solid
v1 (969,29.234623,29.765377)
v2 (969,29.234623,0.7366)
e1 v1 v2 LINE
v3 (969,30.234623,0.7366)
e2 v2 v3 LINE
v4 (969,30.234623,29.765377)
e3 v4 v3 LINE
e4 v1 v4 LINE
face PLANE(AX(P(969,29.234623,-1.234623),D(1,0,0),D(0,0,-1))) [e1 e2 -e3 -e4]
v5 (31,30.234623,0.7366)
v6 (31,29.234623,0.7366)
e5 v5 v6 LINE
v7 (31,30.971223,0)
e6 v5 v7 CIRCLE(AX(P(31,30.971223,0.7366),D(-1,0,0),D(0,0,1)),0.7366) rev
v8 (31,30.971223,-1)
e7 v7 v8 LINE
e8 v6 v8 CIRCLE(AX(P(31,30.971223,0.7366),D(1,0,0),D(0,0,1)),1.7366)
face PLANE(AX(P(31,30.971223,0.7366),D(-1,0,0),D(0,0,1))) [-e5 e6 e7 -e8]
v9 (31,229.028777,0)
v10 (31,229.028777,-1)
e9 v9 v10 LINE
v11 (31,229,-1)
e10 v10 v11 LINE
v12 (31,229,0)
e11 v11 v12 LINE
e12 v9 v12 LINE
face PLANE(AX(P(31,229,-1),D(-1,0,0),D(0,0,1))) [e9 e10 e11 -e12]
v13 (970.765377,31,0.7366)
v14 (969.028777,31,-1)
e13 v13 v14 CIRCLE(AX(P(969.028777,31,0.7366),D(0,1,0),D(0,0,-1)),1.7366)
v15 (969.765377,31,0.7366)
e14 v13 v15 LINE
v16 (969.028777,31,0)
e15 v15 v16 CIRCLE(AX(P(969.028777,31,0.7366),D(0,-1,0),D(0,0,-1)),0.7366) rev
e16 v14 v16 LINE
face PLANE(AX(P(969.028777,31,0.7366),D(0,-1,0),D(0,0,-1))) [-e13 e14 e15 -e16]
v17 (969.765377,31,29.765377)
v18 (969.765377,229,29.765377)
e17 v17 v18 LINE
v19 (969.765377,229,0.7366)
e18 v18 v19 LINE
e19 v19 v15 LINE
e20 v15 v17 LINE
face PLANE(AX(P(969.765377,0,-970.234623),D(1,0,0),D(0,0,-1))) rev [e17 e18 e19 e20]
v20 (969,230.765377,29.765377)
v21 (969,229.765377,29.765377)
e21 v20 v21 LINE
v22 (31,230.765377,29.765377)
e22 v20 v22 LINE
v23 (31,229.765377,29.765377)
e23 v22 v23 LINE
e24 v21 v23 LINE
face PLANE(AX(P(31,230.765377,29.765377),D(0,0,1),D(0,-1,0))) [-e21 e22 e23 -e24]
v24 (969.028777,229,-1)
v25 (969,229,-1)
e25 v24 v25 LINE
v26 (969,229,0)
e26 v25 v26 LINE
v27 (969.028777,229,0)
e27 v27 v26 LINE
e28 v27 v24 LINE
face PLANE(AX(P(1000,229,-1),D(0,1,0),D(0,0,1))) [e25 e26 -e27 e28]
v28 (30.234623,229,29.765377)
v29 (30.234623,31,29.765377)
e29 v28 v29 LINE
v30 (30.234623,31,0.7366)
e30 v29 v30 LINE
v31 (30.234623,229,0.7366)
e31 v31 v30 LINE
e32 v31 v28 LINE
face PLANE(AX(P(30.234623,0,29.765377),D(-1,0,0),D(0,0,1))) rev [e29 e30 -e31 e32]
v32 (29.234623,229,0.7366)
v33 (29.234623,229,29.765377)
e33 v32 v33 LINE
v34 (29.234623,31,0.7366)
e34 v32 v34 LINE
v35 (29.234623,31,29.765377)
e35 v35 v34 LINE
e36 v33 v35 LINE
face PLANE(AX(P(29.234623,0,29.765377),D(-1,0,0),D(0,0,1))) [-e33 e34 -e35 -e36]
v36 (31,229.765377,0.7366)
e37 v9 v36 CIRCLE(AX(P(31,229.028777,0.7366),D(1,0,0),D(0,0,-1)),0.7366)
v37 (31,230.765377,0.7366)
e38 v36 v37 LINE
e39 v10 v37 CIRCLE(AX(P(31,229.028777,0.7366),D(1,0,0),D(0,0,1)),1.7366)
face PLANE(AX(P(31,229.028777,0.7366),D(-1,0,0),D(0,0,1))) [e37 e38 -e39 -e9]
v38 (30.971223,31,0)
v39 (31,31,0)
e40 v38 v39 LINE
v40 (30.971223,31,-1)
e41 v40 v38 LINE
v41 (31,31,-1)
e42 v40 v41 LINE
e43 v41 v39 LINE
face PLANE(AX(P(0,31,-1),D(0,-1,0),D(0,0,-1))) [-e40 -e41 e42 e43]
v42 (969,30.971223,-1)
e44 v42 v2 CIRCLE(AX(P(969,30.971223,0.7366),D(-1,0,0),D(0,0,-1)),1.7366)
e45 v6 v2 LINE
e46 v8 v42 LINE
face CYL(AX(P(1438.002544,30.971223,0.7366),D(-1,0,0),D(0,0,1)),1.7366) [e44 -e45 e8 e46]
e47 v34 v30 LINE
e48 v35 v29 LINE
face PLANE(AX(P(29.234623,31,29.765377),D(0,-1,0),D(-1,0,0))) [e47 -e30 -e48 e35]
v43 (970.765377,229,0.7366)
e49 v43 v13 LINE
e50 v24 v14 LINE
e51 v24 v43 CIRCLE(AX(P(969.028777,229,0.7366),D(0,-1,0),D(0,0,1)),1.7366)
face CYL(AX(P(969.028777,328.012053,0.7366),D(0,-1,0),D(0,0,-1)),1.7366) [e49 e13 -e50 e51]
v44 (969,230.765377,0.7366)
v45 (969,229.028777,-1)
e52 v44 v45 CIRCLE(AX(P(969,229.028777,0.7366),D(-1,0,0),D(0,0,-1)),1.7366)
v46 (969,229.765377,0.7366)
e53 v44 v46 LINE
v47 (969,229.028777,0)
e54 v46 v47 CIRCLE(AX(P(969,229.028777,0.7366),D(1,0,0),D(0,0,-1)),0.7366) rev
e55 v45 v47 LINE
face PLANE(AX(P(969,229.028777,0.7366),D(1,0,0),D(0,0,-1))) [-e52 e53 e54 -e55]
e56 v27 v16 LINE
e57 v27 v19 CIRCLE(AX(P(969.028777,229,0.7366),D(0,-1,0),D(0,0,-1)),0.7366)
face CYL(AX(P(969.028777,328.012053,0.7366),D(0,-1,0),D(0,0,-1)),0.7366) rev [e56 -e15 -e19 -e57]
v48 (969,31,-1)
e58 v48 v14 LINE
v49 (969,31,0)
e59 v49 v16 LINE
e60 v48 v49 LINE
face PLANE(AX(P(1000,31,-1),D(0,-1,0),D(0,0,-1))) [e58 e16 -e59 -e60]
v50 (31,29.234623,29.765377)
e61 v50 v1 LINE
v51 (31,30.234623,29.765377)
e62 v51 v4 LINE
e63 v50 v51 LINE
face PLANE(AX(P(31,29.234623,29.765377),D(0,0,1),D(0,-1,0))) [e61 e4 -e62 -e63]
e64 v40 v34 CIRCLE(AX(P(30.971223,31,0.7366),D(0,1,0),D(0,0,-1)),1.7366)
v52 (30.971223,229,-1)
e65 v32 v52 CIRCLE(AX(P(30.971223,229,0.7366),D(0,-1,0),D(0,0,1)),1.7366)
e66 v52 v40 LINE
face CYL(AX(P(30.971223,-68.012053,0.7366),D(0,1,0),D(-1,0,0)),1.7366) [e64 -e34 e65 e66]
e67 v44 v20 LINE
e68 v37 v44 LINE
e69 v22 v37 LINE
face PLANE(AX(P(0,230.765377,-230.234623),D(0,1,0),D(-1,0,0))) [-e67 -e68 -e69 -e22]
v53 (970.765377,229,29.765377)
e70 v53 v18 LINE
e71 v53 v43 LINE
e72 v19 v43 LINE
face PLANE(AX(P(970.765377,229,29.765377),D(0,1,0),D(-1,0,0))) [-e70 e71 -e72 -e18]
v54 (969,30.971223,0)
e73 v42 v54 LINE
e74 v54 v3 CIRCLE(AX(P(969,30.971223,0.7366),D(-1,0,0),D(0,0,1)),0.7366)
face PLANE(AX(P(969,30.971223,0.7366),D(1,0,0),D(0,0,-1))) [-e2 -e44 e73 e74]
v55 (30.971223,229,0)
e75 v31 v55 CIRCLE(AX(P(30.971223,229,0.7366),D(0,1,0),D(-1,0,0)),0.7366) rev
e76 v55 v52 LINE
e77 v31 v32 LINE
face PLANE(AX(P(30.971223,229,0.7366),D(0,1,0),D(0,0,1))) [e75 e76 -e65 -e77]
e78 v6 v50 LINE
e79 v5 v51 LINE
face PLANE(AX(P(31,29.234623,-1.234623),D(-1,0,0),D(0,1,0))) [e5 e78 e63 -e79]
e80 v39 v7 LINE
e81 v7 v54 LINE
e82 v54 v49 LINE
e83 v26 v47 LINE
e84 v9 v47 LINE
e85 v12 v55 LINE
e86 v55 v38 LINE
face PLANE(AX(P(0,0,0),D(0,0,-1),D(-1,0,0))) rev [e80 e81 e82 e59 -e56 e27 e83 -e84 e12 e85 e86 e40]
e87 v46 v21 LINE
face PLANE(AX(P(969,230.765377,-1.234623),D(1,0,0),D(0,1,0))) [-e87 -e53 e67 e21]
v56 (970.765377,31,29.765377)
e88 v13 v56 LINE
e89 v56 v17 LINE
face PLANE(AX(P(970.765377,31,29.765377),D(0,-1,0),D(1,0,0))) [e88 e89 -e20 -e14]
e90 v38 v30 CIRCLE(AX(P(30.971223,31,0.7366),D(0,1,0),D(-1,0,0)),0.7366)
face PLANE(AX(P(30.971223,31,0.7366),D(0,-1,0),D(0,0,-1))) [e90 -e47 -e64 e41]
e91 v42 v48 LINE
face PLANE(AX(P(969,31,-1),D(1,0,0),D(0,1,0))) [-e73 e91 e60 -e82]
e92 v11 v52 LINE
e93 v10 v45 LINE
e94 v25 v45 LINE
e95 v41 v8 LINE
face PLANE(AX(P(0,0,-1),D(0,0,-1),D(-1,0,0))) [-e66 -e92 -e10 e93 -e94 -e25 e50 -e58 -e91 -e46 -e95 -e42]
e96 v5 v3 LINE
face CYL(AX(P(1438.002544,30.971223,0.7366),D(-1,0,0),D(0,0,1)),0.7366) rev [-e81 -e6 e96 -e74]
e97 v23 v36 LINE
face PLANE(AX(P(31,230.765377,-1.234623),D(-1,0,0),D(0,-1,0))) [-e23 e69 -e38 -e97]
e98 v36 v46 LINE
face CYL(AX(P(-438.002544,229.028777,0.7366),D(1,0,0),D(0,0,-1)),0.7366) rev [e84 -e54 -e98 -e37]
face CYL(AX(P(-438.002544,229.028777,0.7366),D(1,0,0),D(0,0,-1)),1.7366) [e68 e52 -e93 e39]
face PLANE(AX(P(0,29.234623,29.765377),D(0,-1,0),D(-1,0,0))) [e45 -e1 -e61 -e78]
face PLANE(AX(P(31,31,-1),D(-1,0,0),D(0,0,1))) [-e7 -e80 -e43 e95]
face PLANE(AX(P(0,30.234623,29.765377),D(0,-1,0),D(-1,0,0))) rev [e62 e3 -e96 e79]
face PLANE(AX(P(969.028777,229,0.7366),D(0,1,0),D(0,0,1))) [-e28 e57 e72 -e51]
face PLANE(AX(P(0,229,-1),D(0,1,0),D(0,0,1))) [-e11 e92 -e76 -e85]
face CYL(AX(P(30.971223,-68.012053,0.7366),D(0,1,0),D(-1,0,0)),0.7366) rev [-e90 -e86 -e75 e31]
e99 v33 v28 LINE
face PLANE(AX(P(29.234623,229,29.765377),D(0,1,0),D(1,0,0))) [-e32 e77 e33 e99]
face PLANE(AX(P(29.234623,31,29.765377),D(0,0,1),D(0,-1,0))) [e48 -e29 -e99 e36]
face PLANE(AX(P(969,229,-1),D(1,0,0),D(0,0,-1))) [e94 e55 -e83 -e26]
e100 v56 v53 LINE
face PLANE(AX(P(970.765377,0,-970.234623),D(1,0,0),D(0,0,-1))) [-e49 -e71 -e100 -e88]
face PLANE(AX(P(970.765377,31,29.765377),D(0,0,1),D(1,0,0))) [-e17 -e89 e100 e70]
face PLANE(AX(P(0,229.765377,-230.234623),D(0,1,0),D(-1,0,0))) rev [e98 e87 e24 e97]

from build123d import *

# Parameters (mm, degrees)
BASE_FLANGE1_DEPTH         = 1
SKETCHED_START             = 31
SKETCHED_BEND1_DEPTH       = 198
SKETCHED_BEND1_2_DEPTH     = 938
SKETCHED_BEND1_3_OUTLINE_W = 938
SKETCHED_BEND1_3_OUTLINE_H = 1
SKETCHED_BEND1_3_DEPTH     = 29.234623369
SKETCHED_START_2           = 230.765376631
SKETCHED_BEND1_4_OUTLINE_W = 938
SKETCHED_BEND1_4_OUTLINE_H = 1
SKETCHED_BEND1_4_DEPTH     = 29.234623369
SKETCHED_BEND1_5_DEPTH     = 198
SKETCHED_BEND1_6_DEPTH     = 938
SKETCHED_BEND1_7_OUTLINE_W = 198
SKETCHED_BEND1_7_OUTLINE_H = 1
SKETCHED_BEND1_7_DEPTH     = 29.234623369
SKETCHED_START_3           = 970.765376631
SKETCHED_BEND1_8_OUTLINE_W = 198
SKETCHED_BEND1_8_OUTLINE_H = 1
SKETCHED_BEND1_8_DEPTH     = 29.234623369


# Read off the part's stored shape, not the designer's step: Sketched Bend1
# Sheet-metal steps are written as plain solids
with BuildPart() as part:
    # Sketch1 → Base-Flange1 (new body)
    with BuildSketch(Plane.XY):
        Polygon((0, 229), (31, 229), (31, 260), (969, 260), (969, 229), (1000, 229), (1000, 31), (969, 31), (969, 0), (31, 0), (31, 31), (0, 31), align=None)
    extrude(amount=-BASE_FLANGE1_DEPTH)

    # Sketched Bend1 outline → Sketched Bend1 (add)
    with BuildSketch(Plane(origin=(0, 0, 0), x_dir=(1, 0, 0), z_dir=(0, 1, 0)).offset(SKETCHED_START)):
        with BuildLine():
            Line((29.234623369, -0.7366), (29.234623369, -29.765376631))
            Line((29.234623369, -29.765376631), (30.234623369, -29.765376631))
            Line((30.234623369, -29.765376631), (30.234623369, -0.7366))
            ThreePointArc((30.234623369, -0.7366), (30.450368514, -0.215745145), (30.971223369, 0))
            Line((30.971223369, 0), (29.398582279, 0))
            ThreePointArc((29.398582279, 0), (29.276108612, -0.359286442), (29.234623369, -0.7366))
        make_face()
        with BuildLine():
            Line((970.601417721, 0), (969.028776631, 0))
            ThreePointArc((969.028776631, 0), (969.549631486, -0.215745145), (969.765376631, -0.7366))
            Line((969.765376631, -0.7366), (969.765376631, -29.765376631))
            Line((969.765376631, -29.765376631), (970.765376631, -29.765376631))
            Line((970.765376631, -29.765376631), (970.765376631, -0.7366))
            ThreePointArc((970.765376631, -0.7366), (970.723891388, -0.359286442), (970.601417721, 0))
        make_face()
    extrude(amount=SKETCHED_BEND1_DEPTH)

    # Sketched Bend1 2 outline → Sketched Bend1 2 (add)
    with BuildSketch(Plane.YZ.offset(SKETCHED_START)):
        with BuildLine():
            Line((229.028776631, 0), (230.601417721, 0))
            ThreePointArc((230.601417721, 0), (230.723891388, 0.359286442), (230.765376631, 0.7366))
            Line((230.765376631, 0.7366), (230.765376631, 29.765376631))
            Line((230.765376631, 29.765376631), (229.765376631, 29.765376631))
            Line((229.765376631, 29.765376631), (229.765376631, 0.7366))
            ThreePointArc((229.765376631, 0.7366), (229.549631486, 0.215745145), (229.028776631, 0))
        make_face()
        with BuildLine():
            ThreePointArc((29.234623369, 0.7366), (29.276108612, 0.359286442), (29.398582279, 0))
            Line((29.398582279, 0), (30.971223369, 0))
            ThreePointArc((30.971223369, 0), (30.450368514, 0.215745145), (30.234623369, 0.7366))
            Line((30.234623369, 0.7366), (30.234623369, 29.765376631))
            Line((30.234623369, 29.765376631), (29.234623369, 29.765376631))
            Line((29.234623369, 29.765376631), (29.234623369, 0.7366))
        make_face()
    extrude(amount=SKETCHED_BEND1_2_DEPTH)

    # Sketched Bend1 3 outline → Sketched Bend1 3 (cut)
    with BuildSketch(Plane(origin=(0, 0, 0), x_dir=(1, 0, 0), z_dir=(0, 1, 0))):
        with Locations((500, 0.5)):
            Rectangle(SKETCHED_BEND1_3_OUTLINE_W, SKETCHED_BEND1_3_OUTLINE_H)
    extrude(amount=SKETCHED_BEND1_3_DEPTH, mode=Mode.SUBTRACT)

    # Sketched Bend1 4 outline → Sketched Bend1 4 (cut)
    with BuildSketch(Plane(origin=(0, 0, 0), x_dir=(1, 0, 0), z_dir=(0, 1, 0)).offset(SKETCHED_START_2)):
        with Locations((500, 0.5)):
            Rectangle(SKETCHED_BEND1_4_OUTLINE_W, SKETCHED_BEND1_4_OUTLINE_H)
    extrude(amount=SKETCHED_BEND1_4_DEPTH, mode=Mode.SUBTRACT)

    # Sketched Bend1 5 outline → Sketched Bend1 5 (cut)
    with BuildSketch(Plane(origin=(0, 0, 0), x_dir=(1, 0, 0), z_dir=(0, 1, 0)).offset(SKETCHED_START)):
        with BuildLine():
            Line((0, 0), (29.398582279, 0))
            ThreePointArc((29.398582279, 0), (30.039397205, 0.728828115), (30.971223369, 1))
            Line((30.971223369, 1), (0, 1))
            Line((0, 1), (0, 0))
        make_face()
        with BuildLine():
            Line((1000, 1), (969.028776631, 1))
            ThreePointArc((969.028776631, 1), (969.960602795, 0.728828115), (970.601417721, 0))
            Line((970.601417721, 0), (1000, 0))
            Line((1000, 0), (1000, 1))
        make_face()
    extrude(amount=SKETCHED_BEND1_5_DEPTH, mode=Mode.SUBTRACT)

    # Sketched Bend1 6 outline → Sketched Bend1 6 (cut)
    with BuildSketch(Plane.YZ.offset(SKETCHED_START)):
        with BuildLine():
            ThreePointArc((230.601417721, 0), (229.960602795, -0.728828115), (229.028776631, -1))
            Line((229.028776631, -1), (260, -1))
            Line((260, -1), (260, 0))
            Line((260, 0), (230.601417721, 0))
        make_face()
        with BuildLine():
            Line((0, -1), (30.971223369, -1))
            ThreePointArc((30.971223369, -1), (30.039397205, -0.728828115), (29.398582279, 0))
            Line((29.398582279, 0), (0, 0))
            Line((0, 0), (0, -1))
        make_face()
    extrude(amount=SKETCHED_BEND1_6_DEPTH, mode=Mode.SUBTRACT)

    # Sketched Bend1 7 outline → Sketched Bend1 7 (cut)
    with BuildSketch(Plane.YZ):
        with Locations((130, -0.5)):
            Rectangle(SKETCHED_BEND1_7_OUTLINE_W, SKETCHED_BEND1_7_OUTLINE_H)
    extrude(amount=SKETCHED_BEND1_7_DEPTH, mode=Mode.SUBTRACT)

    # Sketched Bend1 8 outline → Sketched Bend1 8 (cut)
    with BuildSketch(Plane.YZ.offset(SKETCHED_START_3)):
        with Locations((130, -0.5)):
            Rectangle(SKETCHED_BEND1_8_OUTLINE_W, SKETCHED_BEND1_8_OUTLINE_H)
    extrude(amount=SKETCHED_BEND1_8_DEPTH, mode=Mode.SUBTRACT)


solid = part.part
